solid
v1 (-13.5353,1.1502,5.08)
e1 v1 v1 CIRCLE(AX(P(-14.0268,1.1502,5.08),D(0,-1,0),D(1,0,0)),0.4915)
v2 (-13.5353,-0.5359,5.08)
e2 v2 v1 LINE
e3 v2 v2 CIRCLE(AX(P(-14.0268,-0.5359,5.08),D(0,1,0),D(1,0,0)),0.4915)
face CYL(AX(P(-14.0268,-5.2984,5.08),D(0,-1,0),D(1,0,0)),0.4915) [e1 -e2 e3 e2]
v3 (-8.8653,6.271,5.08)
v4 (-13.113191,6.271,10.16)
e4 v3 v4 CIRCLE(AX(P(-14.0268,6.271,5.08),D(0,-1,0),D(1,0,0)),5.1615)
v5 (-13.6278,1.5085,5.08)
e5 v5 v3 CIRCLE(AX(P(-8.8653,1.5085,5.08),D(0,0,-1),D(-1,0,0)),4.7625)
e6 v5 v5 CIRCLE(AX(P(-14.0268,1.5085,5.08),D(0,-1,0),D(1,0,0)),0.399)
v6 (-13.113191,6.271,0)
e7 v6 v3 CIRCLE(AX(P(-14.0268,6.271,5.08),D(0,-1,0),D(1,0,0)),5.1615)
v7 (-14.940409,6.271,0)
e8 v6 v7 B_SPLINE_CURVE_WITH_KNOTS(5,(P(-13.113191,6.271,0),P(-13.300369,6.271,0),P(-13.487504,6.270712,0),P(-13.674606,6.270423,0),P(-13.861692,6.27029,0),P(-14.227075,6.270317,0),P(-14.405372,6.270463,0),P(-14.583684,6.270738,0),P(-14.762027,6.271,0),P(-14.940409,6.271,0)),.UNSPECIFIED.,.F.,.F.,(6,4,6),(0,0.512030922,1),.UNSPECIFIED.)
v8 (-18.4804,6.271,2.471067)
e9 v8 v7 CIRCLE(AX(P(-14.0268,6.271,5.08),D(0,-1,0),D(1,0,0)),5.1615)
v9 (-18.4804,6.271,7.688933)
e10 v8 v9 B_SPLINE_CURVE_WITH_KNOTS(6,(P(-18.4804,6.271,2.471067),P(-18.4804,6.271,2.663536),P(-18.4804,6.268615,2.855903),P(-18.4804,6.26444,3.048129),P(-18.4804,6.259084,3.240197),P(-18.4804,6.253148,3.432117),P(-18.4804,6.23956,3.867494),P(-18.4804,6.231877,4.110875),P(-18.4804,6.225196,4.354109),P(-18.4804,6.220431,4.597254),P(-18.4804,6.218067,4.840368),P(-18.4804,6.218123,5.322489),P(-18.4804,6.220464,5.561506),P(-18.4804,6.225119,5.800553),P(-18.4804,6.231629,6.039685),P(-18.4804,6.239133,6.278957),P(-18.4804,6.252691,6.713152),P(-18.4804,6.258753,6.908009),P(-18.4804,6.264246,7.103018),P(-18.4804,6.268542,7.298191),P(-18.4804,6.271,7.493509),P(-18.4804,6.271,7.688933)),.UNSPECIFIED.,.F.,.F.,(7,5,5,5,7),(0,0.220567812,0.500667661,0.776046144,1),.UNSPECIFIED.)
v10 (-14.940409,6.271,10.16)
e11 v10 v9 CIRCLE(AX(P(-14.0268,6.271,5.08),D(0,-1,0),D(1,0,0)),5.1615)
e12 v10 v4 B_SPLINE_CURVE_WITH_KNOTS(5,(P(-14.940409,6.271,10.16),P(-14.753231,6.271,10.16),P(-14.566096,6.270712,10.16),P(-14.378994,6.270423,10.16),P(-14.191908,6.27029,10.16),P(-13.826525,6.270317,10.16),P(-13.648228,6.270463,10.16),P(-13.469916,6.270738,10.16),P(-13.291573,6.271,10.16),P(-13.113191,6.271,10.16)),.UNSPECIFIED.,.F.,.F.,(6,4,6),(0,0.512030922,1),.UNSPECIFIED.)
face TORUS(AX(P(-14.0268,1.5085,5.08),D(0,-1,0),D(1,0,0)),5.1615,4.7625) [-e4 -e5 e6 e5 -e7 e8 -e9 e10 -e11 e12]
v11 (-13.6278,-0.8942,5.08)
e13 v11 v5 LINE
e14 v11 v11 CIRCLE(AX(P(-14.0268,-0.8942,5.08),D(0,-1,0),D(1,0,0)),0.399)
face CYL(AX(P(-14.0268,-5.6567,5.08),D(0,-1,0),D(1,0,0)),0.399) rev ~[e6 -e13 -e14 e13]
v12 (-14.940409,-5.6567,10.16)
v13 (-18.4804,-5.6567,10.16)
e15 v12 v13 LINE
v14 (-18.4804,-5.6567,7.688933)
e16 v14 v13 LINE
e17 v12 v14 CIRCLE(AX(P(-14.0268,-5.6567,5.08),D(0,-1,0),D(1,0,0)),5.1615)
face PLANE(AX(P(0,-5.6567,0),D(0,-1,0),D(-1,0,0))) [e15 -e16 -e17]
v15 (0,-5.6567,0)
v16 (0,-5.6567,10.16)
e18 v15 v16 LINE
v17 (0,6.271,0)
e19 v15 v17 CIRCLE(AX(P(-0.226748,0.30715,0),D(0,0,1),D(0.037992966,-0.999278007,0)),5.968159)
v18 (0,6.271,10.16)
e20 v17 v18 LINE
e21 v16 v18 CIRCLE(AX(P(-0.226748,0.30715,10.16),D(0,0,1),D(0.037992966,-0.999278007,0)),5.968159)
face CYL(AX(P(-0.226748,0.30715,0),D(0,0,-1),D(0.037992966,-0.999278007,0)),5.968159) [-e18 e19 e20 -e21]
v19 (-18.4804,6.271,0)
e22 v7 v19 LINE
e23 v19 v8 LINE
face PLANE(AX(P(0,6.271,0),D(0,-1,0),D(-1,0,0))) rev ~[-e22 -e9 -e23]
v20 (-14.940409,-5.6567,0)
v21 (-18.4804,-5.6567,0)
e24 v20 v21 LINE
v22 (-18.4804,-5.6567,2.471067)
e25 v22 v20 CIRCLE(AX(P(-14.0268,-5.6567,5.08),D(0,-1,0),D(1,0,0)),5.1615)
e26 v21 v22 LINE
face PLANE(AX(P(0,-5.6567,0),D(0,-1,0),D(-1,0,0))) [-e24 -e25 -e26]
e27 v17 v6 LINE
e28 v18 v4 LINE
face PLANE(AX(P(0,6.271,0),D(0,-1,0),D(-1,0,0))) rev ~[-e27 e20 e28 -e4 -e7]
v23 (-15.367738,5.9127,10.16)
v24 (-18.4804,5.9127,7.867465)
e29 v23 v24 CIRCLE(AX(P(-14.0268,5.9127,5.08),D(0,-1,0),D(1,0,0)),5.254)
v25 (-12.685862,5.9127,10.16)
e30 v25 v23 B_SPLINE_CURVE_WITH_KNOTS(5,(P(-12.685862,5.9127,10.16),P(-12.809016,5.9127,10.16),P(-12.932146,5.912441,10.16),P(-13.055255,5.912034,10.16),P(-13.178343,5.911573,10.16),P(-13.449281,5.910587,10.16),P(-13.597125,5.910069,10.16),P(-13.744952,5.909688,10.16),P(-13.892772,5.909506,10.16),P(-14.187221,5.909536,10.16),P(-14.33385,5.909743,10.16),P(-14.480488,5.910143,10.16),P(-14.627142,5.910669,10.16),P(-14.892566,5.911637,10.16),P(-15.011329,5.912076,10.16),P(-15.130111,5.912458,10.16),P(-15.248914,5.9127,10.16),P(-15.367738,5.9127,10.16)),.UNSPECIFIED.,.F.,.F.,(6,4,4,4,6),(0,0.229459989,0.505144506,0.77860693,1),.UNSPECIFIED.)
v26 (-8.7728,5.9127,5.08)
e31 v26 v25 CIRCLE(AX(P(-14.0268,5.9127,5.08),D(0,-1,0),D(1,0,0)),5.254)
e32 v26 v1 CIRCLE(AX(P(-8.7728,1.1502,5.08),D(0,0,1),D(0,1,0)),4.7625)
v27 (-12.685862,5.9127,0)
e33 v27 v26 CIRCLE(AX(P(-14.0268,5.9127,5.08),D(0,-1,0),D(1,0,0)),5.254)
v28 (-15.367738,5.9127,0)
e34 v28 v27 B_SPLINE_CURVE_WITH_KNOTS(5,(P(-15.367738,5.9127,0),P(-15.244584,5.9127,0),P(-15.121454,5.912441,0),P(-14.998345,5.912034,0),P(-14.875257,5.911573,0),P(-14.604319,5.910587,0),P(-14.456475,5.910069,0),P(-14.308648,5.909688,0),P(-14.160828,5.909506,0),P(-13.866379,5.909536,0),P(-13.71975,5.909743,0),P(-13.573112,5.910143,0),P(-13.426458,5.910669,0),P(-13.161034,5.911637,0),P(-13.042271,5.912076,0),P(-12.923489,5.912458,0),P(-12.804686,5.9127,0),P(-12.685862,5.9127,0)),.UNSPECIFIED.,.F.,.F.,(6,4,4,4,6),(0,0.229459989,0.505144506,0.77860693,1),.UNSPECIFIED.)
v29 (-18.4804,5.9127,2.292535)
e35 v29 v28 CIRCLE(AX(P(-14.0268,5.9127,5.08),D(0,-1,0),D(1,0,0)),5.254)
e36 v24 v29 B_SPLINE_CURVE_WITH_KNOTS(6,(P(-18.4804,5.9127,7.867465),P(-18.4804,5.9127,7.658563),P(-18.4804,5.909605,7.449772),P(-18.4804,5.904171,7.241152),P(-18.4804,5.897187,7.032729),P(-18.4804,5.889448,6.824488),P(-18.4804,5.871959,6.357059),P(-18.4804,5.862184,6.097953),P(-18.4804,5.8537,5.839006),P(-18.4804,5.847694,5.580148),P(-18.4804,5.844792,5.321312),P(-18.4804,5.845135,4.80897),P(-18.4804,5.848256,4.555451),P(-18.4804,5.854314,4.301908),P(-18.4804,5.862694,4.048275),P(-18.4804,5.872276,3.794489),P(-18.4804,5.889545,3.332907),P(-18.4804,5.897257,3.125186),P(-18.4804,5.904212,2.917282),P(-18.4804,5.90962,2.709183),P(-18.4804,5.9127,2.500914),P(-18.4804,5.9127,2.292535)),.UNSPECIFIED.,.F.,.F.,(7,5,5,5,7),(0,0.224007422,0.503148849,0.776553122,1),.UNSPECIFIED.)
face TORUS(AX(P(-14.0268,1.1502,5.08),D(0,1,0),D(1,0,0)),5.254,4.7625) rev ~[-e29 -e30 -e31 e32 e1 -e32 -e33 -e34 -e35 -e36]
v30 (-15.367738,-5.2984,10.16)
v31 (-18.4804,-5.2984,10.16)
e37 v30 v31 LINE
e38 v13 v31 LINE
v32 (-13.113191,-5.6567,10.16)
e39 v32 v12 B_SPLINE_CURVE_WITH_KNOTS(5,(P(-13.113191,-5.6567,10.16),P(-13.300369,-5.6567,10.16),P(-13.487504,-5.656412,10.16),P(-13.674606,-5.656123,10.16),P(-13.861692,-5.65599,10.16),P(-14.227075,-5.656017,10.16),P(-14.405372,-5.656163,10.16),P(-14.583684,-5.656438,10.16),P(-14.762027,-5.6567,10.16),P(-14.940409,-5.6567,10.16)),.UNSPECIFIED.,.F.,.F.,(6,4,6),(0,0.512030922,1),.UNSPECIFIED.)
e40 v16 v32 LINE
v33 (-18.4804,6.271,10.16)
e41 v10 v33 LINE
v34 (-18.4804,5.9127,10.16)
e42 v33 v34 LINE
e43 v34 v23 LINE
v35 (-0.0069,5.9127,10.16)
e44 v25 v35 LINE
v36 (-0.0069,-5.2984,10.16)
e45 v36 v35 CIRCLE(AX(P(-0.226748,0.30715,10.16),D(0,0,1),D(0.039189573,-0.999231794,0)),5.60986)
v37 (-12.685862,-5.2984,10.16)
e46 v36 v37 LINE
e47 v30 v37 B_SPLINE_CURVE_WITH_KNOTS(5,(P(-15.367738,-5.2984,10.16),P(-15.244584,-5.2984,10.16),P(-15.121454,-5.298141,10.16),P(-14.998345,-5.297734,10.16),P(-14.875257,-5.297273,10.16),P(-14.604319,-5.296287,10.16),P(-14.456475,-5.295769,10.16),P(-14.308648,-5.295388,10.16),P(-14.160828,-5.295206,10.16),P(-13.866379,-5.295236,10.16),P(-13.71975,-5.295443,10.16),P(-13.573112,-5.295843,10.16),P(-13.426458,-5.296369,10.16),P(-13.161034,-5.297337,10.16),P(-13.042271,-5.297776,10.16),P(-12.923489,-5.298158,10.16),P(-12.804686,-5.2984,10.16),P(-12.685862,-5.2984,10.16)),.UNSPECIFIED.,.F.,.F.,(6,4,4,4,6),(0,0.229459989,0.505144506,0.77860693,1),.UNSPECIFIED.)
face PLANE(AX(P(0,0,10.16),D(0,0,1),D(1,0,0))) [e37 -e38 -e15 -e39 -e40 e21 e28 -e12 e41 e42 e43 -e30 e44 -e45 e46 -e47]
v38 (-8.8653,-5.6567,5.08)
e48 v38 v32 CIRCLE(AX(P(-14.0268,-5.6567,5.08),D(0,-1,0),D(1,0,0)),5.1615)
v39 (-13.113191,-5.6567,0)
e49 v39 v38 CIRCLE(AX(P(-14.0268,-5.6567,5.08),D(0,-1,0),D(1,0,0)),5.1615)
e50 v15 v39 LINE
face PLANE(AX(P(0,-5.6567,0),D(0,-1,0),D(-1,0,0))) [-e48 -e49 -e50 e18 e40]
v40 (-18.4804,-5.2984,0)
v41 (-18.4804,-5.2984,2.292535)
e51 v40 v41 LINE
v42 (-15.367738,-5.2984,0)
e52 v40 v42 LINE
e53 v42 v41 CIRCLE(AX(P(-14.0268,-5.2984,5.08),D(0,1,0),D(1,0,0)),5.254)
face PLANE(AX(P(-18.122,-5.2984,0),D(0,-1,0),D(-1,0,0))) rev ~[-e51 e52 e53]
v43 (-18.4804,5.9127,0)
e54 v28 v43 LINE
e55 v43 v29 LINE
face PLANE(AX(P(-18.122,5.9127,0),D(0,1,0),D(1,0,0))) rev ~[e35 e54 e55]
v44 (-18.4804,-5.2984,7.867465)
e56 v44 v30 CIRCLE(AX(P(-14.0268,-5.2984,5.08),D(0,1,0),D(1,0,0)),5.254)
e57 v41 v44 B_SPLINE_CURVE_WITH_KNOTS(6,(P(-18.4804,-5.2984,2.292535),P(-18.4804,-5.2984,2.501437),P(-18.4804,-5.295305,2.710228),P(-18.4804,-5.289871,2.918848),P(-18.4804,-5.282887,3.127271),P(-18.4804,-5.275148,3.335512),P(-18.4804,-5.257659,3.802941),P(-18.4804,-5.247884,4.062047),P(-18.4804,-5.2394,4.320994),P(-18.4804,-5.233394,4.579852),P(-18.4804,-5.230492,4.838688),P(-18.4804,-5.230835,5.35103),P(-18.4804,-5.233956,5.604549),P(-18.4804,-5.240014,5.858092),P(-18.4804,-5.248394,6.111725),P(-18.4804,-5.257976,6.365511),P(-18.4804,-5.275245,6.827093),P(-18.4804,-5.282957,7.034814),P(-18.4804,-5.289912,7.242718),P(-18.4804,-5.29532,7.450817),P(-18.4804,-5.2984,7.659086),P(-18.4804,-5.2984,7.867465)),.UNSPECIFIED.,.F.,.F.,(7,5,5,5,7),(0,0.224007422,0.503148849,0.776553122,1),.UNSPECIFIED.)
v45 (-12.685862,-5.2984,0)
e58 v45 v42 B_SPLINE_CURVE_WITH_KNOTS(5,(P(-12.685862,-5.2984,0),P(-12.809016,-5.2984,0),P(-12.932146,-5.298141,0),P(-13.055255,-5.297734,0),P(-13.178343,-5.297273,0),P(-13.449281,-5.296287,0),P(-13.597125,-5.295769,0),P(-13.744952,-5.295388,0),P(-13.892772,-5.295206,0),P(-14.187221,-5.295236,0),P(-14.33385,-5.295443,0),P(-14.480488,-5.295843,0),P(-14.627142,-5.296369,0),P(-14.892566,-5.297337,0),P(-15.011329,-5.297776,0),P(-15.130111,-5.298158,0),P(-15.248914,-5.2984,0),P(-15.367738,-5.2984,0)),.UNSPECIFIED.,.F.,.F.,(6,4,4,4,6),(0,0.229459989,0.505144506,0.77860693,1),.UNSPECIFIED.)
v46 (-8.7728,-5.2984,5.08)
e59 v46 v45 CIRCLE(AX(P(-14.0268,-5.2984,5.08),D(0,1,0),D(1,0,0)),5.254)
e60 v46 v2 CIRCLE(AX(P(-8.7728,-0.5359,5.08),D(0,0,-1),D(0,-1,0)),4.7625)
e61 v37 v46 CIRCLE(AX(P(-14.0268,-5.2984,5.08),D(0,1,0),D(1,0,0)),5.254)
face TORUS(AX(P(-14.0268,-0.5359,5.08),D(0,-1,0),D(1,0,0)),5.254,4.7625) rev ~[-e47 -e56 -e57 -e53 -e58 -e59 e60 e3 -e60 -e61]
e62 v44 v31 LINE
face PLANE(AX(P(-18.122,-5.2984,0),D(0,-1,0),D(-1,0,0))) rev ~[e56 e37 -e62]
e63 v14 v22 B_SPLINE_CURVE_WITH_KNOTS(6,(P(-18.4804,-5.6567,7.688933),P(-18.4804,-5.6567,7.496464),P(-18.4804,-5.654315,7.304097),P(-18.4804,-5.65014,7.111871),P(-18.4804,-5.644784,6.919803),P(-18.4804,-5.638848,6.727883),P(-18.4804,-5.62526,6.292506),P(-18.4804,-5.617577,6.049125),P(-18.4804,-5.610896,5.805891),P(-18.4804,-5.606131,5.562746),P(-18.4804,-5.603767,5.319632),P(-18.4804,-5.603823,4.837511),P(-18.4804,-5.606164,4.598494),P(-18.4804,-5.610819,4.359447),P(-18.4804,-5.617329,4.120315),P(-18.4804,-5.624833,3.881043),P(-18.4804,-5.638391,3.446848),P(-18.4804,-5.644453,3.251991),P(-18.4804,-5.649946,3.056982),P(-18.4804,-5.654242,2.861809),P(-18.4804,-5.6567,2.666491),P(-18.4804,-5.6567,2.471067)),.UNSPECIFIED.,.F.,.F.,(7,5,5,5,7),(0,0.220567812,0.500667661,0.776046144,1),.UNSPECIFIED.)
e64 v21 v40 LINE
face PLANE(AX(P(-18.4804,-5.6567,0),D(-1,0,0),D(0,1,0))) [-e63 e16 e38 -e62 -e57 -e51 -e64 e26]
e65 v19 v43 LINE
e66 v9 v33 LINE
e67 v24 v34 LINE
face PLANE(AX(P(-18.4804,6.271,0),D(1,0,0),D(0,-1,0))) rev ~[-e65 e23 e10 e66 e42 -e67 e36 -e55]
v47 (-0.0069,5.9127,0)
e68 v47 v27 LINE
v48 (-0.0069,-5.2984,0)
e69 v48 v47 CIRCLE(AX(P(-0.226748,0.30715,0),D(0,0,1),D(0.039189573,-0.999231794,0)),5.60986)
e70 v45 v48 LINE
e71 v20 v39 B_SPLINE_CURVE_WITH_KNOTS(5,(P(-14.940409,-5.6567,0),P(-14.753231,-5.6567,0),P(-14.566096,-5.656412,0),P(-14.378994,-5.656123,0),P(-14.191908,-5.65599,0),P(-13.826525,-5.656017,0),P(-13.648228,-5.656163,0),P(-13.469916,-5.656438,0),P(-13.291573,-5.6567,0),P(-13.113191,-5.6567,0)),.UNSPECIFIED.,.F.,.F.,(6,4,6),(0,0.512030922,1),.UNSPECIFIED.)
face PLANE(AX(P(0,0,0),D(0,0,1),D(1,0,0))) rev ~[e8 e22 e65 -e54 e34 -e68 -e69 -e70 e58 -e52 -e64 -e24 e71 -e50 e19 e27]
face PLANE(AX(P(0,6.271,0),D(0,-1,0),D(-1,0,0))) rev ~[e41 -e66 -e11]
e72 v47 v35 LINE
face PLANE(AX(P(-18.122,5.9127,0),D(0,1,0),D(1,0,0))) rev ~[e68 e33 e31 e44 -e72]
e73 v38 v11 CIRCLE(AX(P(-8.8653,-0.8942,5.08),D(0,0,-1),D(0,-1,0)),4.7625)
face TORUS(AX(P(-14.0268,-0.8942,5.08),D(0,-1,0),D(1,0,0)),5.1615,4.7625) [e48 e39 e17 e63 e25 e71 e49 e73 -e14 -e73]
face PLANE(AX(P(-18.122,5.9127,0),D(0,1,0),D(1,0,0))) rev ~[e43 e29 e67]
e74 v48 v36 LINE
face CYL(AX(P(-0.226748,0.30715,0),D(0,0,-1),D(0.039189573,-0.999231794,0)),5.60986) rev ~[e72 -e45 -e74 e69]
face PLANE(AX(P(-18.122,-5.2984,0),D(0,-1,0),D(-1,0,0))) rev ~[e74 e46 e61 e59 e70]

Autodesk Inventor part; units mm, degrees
ref_plane "YZ Plane" through (0, 0, 0) normal (1, 0, 0) x (0, 1, 0)
ref_plane "XZ Plane" through (0, 0, 0) normal (0, 1, 0) x (-1, 0, 0)
ref_plane "XY Plane" through (0, 0, 0) normal (0, 0, 1) x (1, 0, 0)
sketch "Sketch1" plane through (0, 0, 0) normal (0, 0, 1) x (1, 0, 0)
  arc A0 (0, -5.6567) -> (0, 6.271) centre (-0.2268, 0.3072) ccw
  line L0 (0, 6.271) -> (-18.4804, 6.271)
  line L1 (0, -5.6567) -> (-18.4804, -5.6567)
  line L2 (-18.122, 5.9127) -> (-0.0069, 5.9127)
  arc A1 (-0.0069, -5.2984) -> (-0.0069, 5.9127) centre (-0.2268, 0.3072) ccw
  line L3 (-0.0069, -5.2984) -> (-18.122, -5.2984)
  line L4 (-18.122, 5.9127) -> (-18.4804, 5.9127)
  line L5 (-18.4804, 6.271) -> (-18.4804, 5.9127)
  line L6 (-18.122, -5.2984) -> (-18.4804, -5.2984)
  line L7 (-18.4804, -5.6567) -> (-18.4804, -5.2984)
  point P0 (0, 0)
extrude "Extrusion1" add sketch "Sketch1" along normal blind 10.16
sketch "Sketch2" plane through (-18.4804, -5.2984, 0) normal (0, 1, 0) x (1, 0, 0)
  circle A0 centre (4.4536, -5.08) radius 0.4915
  point P0 (18.4804, 0)
extrude "Extrusion2" add sketch "Sketch2" along normal blind 11.43
fillet "Fillet1" radius 4.7625 1 edges at (-14.5182, -5.2984, 5.08)
fillet "Fillet2" radius 4.7625 1 edges at (-14.5182, 5.9127, 5.08)
sketch "Sketch3" plane through (-18.4804, -5.6567, 0) normal (0, -1, 0) x (1, 0, 0)
  circle A0 centre (4.4536, 5.08) radius 0.399
extrude "Extrusion3" cut sketch "Sketch3" against normal blind 25.4
fillet "Fillet3" radius 4.7625 1 edges at (-14.4258, 6.271, 5.08)
fillet "Fillet4" radius 4.7625 1 edges at (-14.4258, -5.6567, 5.08)
properties part number "space time"
